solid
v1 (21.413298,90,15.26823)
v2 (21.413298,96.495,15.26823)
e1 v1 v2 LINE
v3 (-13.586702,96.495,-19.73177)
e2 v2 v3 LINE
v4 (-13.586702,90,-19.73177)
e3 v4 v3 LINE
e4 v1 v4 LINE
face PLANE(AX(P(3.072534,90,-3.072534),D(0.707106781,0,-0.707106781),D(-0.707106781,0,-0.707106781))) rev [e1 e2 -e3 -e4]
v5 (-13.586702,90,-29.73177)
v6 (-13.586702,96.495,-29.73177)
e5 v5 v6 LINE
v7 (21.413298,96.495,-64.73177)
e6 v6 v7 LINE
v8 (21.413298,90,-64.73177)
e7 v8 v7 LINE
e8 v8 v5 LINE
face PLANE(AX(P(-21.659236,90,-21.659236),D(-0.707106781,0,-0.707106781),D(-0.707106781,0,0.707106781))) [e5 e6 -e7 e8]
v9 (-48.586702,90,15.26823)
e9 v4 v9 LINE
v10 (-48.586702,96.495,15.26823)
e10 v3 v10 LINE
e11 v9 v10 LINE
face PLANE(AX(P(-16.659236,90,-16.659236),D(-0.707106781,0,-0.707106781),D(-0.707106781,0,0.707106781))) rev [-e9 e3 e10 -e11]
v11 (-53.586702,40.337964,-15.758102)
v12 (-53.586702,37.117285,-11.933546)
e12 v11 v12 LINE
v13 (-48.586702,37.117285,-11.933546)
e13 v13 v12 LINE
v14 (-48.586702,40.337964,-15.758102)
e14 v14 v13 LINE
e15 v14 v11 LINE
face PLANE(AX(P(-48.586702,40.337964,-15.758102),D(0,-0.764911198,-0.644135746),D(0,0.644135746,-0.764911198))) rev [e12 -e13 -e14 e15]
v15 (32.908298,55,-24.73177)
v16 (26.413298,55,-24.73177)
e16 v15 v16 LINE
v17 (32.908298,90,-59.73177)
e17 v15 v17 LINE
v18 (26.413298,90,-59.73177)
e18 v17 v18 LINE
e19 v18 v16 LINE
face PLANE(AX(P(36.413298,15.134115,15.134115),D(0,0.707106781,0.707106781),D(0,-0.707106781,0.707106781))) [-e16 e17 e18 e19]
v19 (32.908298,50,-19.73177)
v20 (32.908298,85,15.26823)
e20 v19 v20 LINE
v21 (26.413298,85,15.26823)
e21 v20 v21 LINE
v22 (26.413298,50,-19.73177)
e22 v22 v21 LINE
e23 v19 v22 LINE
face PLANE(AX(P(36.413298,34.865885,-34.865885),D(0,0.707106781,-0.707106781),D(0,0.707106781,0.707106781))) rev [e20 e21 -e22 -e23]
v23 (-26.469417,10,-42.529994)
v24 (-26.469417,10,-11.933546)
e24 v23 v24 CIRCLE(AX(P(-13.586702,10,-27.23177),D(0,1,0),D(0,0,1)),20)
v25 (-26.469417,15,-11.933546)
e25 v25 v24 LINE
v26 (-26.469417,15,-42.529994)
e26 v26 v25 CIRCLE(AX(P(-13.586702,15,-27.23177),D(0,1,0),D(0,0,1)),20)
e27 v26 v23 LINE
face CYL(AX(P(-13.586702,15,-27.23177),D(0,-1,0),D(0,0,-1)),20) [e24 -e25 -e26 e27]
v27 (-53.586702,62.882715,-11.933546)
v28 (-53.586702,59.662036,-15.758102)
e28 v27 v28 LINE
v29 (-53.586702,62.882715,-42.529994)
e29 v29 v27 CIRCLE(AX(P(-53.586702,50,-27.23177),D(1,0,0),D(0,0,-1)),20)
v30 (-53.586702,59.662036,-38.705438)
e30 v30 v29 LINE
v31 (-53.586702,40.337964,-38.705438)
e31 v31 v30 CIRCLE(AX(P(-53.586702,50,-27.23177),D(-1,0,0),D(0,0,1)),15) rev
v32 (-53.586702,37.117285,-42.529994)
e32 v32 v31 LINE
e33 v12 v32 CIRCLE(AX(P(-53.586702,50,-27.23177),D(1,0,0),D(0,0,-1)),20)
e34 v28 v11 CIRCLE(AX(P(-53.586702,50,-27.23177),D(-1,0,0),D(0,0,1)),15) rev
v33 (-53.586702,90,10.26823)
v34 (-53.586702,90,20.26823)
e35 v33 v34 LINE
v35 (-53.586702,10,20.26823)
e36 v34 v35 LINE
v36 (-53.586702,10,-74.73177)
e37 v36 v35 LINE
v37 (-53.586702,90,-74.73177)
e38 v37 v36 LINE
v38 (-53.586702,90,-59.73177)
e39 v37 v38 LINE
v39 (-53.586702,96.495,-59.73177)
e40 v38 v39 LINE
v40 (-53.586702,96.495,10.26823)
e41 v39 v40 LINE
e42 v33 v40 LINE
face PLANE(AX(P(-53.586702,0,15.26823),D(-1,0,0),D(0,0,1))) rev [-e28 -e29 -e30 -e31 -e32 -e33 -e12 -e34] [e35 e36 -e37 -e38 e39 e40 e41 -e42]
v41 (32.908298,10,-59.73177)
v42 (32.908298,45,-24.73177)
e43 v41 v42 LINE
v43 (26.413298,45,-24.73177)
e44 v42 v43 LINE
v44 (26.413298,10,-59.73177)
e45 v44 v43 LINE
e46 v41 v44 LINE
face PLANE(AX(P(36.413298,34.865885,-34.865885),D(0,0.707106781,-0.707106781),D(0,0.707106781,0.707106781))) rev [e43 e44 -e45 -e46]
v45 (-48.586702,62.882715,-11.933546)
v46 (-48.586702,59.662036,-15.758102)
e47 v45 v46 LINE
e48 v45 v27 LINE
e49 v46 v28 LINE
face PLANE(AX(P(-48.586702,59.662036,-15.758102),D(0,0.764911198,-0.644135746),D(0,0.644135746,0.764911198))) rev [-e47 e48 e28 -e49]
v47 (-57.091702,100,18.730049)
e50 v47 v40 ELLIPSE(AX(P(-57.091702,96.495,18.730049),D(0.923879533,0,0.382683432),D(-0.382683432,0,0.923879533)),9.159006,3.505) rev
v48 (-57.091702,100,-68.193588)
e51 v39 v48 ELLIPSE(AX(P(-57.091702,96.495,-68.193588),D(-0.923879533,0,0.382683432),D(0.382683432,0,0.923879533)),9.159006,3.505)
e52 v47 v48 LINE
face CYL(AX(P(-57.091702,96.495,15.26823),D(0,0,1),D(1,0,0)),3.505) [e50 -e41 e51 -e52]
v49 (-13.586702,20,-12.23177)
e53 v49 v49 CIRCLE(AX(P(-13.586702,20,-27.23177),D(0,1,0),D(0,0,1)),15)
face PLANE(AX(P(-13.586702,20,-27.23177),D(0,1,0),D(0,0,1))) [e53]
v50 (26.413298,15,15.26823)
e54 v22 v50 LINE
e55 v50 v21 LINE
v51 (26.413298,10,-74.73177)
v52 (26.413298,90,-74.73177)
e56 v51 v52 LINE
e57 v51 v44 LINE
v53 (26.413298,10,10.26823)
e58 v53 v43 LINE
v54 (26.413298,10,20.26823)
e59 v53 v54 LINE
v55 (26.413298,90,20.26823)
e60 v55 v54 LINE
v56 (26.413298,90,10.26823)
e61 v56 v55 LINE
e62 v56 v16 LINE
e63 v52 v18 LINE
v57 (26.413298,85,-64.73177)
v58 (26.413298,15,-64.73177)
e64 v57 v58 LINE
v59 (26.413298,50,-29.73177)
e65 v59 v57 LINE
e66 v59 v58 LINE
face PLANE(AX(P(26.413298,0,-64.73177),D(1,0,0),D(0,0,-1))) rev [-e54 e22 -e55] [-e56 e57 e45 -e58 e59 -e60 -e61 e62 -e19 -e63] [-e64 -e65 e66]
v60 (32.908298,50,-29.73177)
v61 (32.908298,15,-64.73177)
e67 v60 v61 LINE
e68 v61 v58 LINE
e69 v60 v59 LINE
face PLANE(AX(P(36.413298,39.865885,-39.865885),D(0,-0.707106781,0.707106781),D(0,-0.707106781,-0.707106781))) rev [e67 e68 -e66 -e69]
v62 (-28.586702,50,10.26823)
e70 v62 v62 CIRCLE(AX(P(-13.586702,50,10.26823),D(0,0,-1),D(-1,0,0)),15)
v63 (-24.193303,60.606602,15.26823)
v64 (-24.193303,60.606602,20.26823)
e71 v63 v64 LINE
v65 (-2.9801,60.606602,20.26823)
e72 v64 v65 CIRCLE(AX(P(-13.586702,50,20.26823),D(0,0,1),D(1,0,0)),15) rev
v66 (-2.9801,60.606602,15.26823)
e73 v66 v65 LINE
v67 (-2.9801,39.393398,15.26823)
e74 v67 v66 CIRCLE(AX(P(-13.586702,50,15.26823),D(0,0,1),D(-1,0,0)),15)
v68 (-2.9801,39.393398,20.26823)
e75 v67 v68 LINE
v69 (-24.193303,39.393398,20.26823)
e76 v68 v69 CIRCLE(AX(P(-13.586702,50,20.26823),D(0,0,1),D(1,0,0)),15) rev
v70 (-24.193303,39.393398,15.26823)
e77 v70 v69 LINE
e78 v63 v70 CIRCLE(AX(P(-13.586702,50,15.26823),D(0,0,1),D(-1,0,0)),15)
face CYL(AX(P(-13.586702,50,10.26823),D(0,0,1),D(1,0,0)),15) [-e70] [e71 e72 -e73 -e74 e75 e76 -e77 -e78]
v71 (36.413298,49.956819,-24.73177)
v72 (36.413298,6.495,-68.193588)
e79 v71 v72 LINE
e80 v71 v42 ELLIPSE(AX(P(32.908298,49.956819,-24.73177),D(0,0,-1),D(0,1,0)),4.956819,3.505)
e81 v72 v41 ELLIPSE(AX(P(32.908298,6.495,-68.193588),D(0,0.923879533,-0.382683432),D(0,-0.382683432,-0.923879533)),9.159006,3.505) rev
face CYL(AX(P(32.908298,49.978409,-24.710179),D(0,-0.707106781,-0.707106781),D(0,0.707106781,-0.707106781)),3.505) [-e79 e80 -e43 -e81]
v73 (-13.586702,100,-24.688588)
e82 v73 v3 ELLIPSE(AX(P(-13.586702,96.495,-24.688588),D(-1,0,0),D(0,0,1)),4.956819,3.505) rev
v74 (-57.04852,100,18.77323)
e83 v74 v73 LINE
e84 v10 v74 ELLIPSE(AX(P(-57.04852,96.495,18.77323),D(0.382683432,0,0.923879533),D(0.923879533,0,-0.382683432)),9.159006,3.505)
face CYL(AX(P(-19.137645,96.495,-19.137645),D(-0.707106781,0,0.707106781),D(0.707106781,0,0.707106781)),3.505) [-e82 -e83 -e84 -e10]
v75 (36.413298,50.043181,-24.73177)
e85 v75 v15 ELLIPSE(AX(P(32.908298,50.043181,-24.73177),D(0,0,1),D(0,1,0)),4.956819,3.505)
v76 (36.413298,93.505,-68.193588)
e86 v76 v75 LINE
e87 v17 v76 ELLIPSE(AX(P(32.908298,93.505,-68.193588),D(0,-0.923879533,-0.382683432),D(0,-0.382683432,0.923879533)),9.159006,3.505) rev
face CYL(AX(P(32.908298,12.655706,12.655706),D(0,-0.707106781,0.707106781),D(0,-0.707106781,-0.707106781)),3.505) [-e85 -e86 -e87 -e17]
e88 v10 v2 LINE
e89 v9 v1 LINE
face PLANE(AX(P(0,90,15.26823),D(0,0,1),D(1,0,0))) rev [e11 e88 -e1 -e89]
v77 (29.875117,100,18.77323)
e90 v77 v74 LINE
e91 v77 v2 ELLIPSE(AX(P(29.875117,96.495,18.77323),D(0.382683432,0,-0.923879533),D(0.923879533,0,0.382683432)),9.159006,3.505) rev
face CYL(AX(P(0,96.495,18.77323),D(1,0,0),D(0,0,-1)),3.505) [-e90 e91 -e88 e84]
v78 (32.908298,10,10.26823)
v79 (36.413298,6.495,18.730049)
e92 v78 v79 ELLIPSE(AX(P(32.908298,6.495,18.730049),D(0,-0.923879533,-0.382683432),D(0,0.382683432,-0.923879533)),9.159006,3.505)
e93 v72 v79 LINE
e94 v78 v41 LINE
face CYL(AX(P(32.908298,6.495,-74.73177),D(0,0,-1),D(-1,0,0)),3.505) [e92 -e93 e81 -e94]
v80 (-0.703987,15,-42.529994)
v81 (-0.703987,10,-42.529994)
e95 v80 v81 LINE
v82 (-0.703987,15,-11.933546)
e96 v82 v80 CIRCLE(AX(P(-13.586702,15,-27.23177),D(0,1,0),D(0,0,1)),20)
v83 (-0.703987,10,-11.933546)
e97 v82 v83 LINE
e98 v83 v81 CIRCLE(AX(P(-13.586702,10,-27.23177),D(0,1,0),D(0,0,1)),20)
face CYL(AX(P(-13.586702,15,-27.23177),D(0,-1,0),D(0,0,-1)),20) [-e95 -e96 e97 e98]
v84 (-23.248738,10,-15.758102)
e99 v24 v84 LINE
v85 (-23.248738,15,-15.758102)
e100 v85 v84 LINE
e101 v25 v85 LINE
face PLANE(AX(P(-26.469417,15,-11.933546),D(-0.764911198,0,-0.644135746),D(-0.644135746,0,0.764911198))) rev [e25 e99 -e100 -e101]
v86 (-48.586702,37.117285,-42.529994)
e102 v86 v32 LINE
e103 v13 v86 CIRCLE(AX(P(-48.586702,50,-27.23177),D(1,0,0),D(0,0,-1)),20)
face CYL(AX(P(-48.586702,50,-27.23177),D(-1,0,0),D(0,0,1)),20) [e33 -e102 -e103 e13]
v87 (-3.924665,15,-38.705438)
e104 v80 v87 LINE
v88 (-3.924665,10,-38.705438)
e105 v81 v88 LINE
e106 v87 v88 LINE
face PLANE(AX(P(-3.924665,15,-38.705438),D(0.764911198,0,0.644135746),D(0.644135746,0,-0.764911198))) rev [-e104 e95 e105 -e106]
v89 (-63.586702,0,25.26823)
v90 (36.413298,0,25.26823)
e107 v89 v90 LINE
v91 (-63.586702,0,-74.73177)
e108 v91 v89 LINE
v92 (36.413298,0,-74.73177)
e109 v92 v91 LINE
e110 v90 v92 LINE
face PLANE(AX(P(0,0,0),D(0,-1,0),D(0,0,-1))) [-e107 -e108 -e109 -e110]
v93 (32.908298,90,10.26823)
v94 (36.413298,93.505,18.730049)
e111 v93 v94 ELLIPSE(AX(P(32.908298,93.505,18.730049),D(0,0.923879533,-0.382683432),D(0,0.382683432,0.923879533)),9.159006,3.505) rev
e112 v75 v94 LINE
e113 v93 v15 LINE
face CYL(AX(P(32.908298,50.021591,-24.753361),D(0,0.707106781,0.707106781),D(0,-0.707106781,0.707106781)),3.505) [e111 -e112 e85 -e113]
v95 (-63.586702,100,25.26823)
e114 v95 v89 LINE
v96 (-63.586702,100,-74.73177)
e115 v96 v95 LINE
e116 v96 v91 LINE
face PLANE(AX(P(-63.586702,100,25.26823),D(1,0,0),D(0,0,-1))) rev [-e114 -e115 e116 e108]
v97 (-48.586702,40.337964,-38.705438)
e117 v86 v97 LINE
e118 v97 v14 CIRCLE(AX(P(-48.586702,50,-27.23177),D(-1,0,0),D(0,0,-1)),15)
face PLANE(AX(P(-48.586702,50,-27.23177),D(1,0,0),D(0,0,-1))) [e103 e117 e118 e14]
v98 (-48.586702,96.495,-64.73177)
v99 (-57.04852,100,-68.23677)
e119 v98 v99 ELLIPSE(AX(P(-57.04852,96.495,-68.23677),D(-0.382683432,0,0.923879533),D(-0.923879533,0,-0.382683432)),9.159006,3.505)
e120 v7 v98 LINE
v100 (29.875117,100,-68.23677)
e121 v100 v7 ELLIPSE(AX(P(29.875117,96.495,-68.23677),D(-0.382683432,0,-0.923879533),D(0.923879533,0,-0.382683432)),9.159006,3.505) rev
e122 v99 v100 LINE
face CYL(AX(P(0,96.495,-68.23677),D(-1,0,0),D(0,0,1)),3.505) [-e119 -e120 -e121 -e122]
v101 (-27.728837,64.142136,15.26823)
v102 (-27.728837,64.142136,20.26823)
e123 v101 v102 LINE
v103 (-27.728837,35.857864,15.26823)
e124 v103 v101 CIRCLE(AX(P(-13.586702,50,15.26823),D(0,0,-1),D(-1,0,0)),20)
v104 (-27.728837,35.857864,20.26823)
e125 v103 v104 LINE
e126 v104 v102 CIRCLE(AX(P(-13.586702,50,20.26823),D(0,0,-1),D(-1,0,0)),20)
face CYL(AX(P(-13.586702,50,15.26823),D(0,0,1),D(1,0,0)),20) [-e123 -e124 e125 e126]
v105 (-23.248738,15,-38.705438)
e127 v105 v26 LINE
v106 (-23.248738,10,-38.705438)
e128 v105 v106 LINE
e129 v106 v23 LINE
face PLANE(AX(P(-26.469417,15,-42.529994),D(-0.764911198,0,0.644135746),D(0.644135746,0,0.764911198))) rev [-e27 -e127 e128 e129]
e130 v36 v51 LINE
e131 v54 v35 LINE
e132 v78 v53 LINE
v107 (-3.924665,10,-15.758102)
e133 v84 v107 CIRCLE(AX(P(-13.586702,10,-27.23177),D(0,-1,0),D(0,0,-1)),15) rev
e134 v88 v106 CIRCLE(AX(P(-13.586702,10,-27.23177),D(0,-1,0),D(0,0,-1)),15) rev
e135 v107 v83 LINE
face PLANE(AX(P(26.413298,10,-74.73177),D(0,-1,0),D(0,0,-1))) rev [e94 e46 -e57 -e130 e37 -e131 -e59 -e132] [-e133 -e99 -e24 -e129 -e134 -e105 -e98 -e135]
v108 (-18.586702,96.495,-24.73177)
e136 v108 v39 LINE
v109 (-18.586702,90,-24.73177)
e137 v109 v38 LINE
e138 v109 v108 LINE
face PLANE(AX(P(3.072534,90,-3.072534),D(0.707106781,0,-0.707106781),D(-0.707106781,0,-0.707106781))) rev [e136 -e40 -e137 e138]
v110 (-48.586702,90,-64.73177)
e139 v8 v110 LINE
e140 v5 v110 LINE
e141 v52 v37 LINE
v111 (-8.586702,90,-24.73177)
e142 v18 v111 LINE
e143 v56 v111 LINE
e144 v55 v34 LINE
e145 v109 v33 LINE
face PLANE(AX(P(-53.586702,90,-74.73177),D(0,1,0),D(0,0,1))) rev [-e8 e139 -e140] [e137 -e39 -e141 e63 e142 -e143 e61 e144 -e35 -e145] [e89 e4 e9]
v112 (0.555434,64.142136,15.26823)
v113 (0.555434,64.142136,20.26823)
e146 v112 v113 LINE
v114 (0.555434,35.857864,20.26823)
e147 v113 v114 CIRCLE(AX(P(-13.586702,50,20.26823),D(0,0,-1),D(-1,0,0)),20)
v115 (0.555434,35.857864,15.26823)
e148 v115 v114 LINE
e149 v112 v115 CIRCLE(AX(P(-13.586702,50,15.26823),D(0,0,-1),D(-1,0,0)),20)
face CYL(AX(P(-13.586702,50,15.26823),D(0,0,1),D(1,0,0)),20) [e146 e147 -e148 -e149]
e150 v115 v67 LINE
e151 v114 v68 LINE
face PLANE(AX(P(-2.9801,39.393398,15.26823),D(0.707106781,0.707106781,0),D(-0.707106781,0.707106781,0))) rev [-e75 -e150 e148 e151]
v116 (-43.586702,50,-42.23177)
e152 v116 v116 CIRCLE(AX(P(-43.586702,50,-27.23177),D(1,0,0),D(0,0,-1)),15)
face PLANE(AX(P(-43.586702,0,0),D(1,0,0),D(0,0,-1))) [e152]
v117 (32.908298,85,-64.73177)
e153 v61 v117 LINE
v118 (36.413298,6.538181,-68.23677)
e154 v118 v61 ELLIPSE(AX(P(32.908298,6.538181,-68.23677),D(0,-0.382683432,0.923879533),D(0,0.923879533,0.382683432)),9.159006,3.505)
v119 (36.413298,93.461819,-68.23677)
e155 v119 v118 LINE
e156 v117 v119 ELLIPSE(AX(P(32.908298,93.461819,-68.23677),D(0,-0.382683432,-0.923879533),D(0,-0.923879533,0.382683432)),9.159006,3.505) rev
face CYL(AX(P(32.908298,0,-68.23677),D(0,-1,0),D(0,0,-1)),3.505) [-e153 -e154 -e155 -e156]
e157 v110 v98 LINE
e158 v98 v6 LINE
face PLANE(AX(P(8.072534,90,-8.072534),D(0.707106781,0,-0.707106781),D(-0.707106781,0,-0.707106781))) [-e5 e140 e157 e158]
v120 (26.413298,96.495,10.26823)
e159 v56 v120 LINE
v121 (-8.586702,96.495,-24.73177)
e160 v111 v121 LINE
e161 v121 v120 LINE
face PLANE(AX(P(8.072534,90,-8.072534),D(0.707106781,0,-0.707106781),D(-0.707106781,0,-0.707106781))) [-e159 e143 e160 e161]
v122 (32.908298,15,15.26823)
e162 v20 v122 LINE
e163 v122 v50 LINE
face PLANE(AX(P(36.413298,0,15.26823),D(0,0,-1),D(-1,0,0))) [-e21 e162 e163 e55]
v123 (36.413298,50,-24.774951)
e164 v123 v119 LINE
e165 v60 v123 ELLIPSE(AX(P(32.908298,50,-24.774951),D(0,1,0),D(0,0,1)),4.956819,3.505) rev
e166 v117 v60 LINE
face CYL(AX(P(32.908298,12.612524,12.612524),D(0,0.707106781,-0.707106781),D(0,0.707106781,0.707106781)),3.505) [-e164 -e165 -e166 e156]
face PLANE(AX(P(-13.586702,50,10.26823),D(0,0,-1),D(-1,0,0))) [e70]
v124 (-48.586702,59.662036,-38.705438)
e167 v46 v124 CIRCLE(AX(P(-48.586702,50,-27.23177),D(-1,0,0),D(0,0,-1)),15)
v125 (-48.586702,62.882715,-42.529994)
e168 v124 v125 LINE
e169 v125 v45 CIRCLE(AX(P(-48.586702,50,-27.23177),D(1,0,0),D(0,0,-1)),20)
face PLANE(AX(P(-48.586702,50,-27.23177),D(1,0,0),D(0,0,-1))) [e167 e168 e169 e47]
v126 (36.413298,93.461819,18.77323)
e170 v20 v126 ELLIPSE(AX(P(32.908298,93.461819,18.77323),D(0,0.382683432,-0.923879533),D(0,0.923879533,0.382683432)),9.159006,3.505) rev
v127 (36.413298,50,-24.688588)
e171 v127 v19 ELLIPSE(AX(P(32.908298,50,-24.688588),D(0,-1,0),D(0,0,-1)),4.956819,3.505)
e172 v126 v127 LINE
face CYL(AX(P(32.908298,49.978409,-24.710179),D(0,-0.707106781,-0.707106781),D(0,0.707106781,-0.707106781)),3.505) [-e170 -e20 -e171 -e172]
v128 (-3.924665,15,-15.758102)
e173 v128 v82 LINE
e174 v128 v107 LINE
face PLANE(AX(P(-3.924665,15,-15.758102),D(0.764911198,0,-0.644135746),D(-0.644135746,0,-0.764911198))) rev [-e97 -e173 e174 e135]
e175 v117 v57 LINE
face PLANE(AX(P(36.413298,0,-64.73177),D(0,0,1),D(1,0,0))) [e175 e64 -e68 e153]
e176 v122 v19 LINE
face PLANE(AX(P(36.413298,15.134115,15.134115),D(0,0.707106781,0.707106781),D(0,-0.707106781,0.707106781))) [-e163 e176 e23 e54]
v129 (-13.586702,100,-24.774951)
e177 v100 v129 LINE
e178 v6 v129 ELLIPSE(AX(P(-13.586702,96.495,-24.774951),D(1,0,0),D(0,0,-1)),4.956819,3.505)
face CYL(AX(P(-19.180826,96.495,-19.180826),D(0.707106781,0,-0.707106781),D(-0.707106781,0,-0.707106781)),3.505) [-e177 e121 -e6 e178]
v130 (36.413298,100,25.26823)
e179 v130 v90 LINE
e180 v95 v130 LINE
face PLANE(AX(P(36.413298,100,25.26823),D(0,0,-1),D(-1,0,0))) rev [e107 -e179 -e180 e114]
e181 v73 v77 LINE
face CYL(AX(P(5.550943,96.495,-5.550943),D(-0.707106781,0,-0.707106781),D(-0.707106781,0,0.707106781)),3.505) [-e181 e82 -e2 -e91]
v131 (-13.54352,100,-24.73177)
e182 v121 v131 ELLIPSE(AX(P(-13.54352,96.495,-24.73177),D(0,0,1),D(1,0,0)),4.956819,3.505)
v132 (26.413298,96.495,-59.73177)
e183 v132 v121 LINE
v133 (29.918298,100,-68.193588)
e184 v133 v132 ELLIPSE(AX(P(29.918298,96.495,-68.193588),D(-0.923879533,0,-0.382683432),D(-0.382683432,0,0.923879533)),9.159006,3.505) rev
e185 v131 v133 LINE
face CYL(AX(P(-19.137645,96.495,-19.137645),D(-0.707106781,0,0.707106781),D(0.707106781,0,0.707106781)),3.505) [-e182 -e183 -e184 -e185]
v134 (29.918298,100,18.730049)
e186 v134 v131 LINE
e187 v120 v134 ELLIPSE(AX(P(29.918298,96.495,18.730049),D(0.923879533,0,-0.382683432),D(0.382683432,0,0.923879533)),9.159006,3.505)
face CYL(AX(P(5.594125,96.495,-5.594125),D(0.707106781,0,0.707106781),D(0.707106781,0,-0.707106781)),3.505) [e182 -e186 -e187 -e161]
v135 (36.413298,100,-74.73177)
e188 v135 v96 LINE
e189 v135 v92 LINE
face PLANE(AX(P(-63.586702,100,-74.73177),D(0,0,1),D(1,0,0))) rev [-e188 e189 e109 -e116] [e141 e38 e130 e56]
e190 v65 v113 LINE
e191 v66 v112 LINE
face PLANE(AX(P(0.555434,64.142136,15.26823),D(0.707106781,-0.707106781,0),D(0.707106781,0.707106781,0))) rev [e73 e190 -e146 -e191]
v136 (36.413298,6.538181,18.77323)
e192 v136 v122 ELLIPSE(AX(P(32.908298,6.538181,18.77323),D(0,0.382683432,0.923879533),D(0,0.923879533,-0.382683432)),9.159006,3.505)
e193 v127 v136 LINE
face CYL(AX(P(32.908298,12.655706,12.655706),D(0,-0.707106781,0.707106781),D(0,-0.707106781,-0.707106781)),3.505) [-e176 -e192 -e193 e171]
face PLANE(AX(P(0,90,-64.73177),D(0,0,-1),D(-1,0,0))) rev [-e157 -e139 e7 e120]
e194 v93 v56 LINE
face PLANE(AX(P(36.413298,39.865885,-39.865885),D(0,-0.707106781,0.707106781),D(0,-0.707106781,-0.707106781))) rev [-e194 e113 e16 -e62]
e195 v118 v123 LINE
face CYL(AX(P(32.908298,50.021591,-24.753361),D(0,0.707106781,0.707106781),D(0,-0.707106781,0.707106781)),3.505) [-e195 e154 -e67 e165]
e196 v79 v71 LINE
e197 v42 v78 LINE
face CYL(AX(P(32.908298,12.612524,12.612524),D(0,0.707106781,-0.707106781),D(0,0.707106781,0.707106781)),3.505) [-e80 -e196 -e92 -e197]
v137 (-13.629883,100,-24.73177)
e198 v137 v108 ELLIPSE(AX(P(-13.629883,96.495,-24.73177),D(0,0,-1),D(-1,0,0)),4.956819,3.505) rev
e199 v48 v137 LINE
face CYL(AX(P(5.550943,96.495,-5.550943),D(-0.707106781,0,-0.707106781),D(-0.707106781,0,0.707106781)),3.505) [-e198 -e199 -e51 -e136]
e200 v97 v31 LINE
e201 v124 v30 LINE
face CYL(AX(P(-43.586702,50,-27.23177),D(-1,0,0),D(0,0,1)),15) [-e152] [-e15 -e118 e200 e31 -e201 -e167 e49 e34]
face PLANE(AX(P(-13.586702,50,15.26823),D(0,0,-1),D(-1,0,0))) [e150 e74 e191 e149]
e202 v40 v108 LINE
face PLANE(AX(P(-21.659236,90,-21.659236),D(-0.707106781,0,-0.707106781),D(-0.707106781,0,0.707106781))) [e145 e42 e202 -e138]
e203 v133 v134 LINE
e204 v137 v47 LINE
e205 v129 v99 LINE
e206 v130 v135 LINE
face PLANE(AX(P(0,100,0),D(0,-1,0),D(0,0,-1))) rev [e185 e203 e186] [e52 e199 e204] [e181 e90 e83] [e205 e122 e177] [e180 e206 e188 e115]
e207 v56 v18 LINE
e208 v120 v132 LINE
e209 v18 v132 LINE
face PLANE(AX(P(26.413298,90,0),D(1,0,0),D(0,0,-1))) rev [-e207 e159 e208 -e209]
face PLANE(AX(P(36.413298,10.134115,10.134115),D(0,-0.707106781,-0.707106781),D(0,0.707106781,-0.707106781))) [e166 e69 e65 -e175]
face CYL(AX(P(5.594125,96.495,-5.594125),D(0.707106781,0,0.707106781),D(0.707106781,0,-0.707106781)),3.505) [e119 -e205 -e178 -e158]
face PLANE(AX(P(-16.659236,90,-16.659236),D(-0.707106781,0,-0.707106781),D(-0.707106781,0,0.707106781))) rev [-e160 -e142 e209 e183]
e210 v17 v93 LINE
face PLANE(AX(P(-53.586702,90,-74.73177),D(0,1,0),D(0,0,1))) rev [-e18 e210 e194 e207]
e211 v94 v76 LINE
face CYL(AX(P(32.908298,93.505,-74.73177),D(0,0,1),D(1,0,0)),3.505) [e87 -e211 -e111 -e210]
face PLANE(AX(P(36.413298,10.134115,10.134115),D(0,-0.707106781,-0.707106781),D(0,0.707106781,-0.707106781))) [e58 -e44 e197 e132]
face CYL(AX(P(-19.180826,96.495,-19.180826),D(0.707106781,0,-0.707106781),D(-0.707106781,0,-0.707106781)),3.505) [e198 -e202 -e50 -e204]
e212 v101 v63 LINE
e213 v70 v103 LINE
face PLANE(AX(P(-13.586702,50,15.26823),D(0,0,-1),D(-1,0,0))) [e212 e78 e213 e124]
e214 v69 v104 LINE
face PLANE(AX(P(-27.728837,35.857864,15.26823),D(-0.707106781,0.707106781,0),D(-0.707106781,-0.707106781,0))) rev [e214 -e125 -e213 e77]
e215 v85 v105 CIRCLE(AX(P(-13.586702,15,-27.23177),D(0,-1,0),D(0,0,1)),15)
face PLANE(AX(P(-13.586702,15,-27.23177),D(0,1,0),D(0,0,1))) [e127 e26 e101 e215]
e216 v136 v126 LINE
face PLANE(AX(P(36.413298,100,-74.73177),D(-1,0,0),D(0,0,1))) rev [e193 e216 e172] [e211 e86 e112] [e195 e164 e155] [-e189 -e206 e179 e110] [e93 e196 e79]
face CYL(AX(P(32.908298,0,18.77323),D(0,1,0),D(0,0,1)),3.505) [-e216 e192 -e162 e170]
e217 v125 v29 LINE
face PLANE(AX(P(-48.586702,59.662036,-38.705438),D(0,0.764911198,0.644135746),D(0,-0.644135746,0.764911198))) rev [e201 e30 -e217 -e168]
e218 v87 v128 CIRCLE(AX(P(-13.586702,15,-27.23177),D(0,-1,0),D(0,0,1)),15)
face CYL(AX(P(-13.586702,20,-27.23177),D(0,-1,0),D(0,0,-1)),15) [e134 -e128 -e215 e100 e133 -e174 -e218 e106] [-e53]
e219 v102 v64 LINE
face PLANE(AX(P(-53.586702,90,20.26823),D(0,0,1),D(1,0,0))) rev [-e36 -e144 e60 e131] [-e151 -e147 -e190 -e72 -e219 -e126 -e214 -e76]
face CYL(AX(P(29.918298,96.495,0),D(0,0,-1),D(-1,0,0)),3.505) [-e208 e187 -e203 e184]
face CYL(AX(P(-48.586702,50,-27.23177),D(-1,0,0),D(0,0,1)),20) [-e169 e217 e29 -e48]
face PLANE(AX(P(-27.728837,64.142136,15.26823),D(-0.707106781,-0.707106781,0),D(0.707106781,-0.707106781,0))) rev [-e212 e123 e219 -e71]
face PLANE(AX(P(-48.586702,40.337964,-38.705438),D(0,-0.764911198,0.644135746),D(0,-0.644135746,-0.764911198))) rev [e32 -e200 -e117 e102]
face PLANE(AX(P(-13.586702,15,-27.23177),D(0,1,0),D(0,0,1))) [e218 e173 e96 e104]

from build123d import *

# Parameters (mm, degrees)
SKETCH1_W            = 100
SKETCH1_H            = 100
BOSS_EXTRUDE1_DEPTH  = 100
SKETCH2_W            = 80
SKETCH2_H            = 80
CUT_EXTRUDE1_DEPTH   = 100
SKETCH3_W            = 80
SKETCH3_H            = 80
CUT_EXTRUDE2_DEPTH   = 100
CUT_EXTRUDE3_DEPTH   = 100
FILLET39_R           = 3.505
FILLET40_R           = 3.505
FILLET41_R           = 3.505
FILLET42_R           = 3.505
SKETCH5_W            = 80
SKETCH5_H            = 5
BOSS_EXTRUDE2_DEPTH  = 80
BOSS_EXTRUDE4_DEPTH  = 10
FILLET106_R          = 3.505
FILLET107_R          = 3.505
FILLET108_R          = 3.505
FILLET109_R          = 3.505
SKETCH10_W           = 100
SKETCH10_H           = 100
BOSS_EXTRUDE6_DEPTH  = 10
SKETCH11_W           = 100
SKETCH11_H           = 100
BOSS_EXTRUDE7_DEPTH  = 10
SKETCH12_R           = 15
BOSS_EXTRUDE8_DEPTH  = 10
BOSS_EXTRUDE9_DEPTH  = 5
SKETCH18_R           = 15
BOSS_EXTRUDE10_DEPTH = 10
BOSS_EXTRUDE11_DEPTH = 5
CUT_EXTRUDE4_DEPTH   = 10
SKETCH26_W           = 91.840928508
SKETCH26_H           = 89.348142656
BOSS_EXTRUDE12_DEPTH = 10
FILLET113_R          = 3.505
FILLET114_R          = 3.505
SKETCH28_R           = 15
BOSS_EXTRUDE13_DEPTH = 10
BOSS_EXTRUDE14_DEPTH = 5
FILLET115_R          = 3.505


# Some blends are built 0.0001 mm under size
with BuildPart() as part:
    # Sketch1 → Boss-Extrude1 (new body)
    with BuildSketch(Plane(origin=(0, 0, 0), x_dir=(1, 0, 0), z_dir=(0, 1, 0))):
        with Locations((-13.586701651, 24.731769861)):
            Rectangle(SKETCH1_W, SKETCH1_H)
    extrude(amount=BOSS_EXTRUDE1_DEPTH)

    # Sketch2 → Cut-Extrude1 (cut)
    with BuildSketch(Plane(origin=(0, 100, 0), x_dir=(1, 0, 0), z_dir=(0, 1, 0))):
        with Locations((-13.586701651, 24.731769861)):
            Rectangle(SKETCH2_W, SKETCH2_H)
    extrude(amount=-CUT_EXTRUDE1_DEPTH, mode=Mode.SUBTRACT)

    # Sketch3 → Cut-Extrude2 (cut)
    with BuildSketch(Plane.XY.offset(25.268230139)):
        with Locations((-13.586701651, 50)):
            Rectangle(SKETCH3_W, SKETCH3_H)
    extrude(amount=-CUT_EXTRUDE2_DEPTH, mode=Mode.SUBTRACT)

    # Sketch4 → Cut-Extrude3 (cut)
    with BuildSketch(Plane.ZY.offset(63.586701651)):
        Polygon((-59.731769861, 10), (10.268230139, 10), (-24.731769861, 45), align=None)
        Polygon((-64.731769861, 15), (-29.731769861, 50), (-64.731769861, 85), align=None)
        Polygon((-59.731769861, 90), (-24.731769861, 55), (10.268230139, 90), align=None)
        Polygon((-19.731769861, 50), (15.268230139, 15), (15.268230139, 85), align=None)
    extrude(amount=-CUT_EXTRUDE3_DEPTH, mode=Mode.SUBTRACT)

    # Fillet39
    # the kernel refuses this fillet: 3.505 mm, written as the material it adds along each edge
    with BuildSketch(Plane(origin=(-63.586701651, 45, -24.731769861), x_dir=(0, -0.7071067811865476, -0.7071067811865476), z_dir=(1, 0, 0))) as fillet39_piece_1:
        with BuildLine():
            CenterArc((FILLET39_R, -FILLET39_R), FILLET39_R, 90, 90)
            Line((0, -FILLET39_R), (0, 0))
            Line((0, 0), (FILLET39_R, 0))
        make_face()
    extrude(amount=10)
    with BuildSketch(Plane(origin=(-63.586701651, 10, 10.268230139), x_dir=(0, 0, -1), z_dir=(1, 0, 0))) as fillet39_piece_2:
        with BuildLine():
            CenterArc((FILLET39_R * 2.41421356237, FILLET39_R), FILLET39_R, 135, 135)
            Line((FILLET39_R * 1.70710678119, FILLET39_R * 1.70710678119), (0, 0))
            Line((0, 0), (FILLET39_R * 2.41421356237, 0))
        make_face()
    extrude(amount=10)
    # the kernel refuses this fillet: 3.505 mm, written as the material it takes off along each edge
    with BuildSketch(Plane(origin=(-63.586701651, 15.983409268, 4.284820871), x_dir=(0, 0.7071067811865476, 0.7071067811865476), z_dir=(0, 0.7071067811865475, -0.7071067811865476)), Plane(origin=(-53.586701651, 42.521590732, -22.253360593), x_dir=(0, 0.7071067811865476, 0.7071067811865476), z_dir=(0, -0.7071067811865475, 0.7071067811865476))) as fillet39_2_piece_1:
        with BuildLine():
            CenterArc((FILLET39_R, FILLET39_R), FILLET39_R, 180, 90)
            Line((0, FILLET39_R), (0, 0))
            Line((0, 0), (FILLET39_R, 0))
        make_face()
    extrude(amount=37.530656147, mode=Mode.SUBTRACT)
    with BuildSketch(Plane(origin=(-63.586701651, 10, -68.494269861), x_dir=(0, -1, 0), z_dir=(0, 0, 1))) as fillet39_2_piece_2_section:
        with BuildLine():
            CenterArc((FILLET39_R, FILLET39_R), FILLET39_R, 180, 90)
            Line((0, FILLET39_R), (0, 0))
            Line((0, 0), (FILLET39_R, 0))
        make_face()
    fillet39_2_piece_2 = extrude(amount=70.300681464, mode=Mode.PRIVATE)
    fillet39_2_piece_2 = split(fillet39_2_piece_2, bisect_by=Plane(origin=(-62.798598249, 24.782539109, -44.949230752), z_dir=(0, -0.7071067811865476, 0.7071067811865476)), keep=Keep.TOP, mode=Mode.PRIVATE)
    add(fillet39_2_piece_2, mode=Mode.SUBTRACT)
    with BuildSketch(Plane(origin=(-53.586701651, 3.80397683, -65.927793031), x_dir=(0, 0.7071067811865475, -0.7071067811865475), z_dir=(0, 0.7071067811865476, 0.7071067811865476))) as fillet39_2_piece_3_section:
        with BuildLine():
            CenterArc((FILLET39_R, FILLET39_R), FILLET39_R, 180, 90)
            Line((0, FILLET39_R), (0, 0))
            Line((0, 0), (FILLET39_R, 0))
        make_face()
    fillet39_2_piece_3 = extrude(amount=54.754974683, mode=Mode.PRIVATE)
    fillet39_2_piece_3 = split(fillet39_2_piece_3, bisect_by=Plane(origin=(-54.373006967, 10, -44.325568199), z_dir=(0, 1, 0)), keep=Keep.TOP, mode=Mode.PRIVATE)
    add(fillet39_2_piece_3, mode=Mode.SUBTRACT)
    with BuildSketch(Plane(origin=(-53.586701651, 10, 1.806411603), x_dir=(0, -1, 0), z_dir=(0, 0, -1))) as fillet39_2_piece_4_section:
        with BuildLine():
            CenterArc((FILLET39_R, FILLET39_R), FILLET39_R, 180, 90)
            Line((0, FILLET39_R), (0, 0))
            Line((0, 0), (FILLET39_R, 0))
        make_face()
    fillet39_2_piece_4 = extrude(amount=70.300681464, mode=Mode.PRIVATE)
    fillet39_2_piece_4 = split(fillet39_2_piece_4, bisect_by=Plane(origin=(-54.374805052, 24.782539109, -44.949230752), z_dir=(0, -0.7071067811865476, 0.7071067811865476)), keep=Keep.TOP, mode=Mode.PRIVATE)
    add(fillet39_2_piece_4, mode=Mode.SUBTRACT)
    with BuildSketch(Plane(origin=(-63.586701651, 42.521590732, -27.210179129), x_dir=(0, 0.7071067811865476, -0.7071067811865476), z_dir=(0, -0.7071067811865476, -0.7071067811865476))) as fillet39_2_piece_5_section:
        with BuildLine():
            CenterArc((FILLET39_R, FILLET39_R), FILLET39_R, 180, 90)
            Line((0, FILLET39_R), (0, 0))
            Line((0, 0), (FILLET39_R, 0))
        make_face()
    fillet39_2_piece_5 = extrude(amount=54.754974683, mode=Mode.PRIVATE)
    fillet39_2_piece_5 = split(fillet39_2_piece_5, bisect_by=Plane(origin=(-62.800396334, 10, -44.325568199), z_dir=(0, 1, 0)), keep=Keep.TOP, mode=Mode.PRIVATE)
    add(fillet39_2_piece_5, mode=Mode.SUBTRACT)
    with BuildSketch(Plane(origin=(-63.586701651, 40.043181464, -24.731769861), x_dir=(0, 0.7071067811865476, -0.7071067811865476), z_dir=(0, -0.7071067811865476, -0.7071067811865476))) as fillet39_2_piece_6:
        with BuildLine():
            CenterArc((3.505 + FILLET39_R, FILLET39_R), FILLET39_R, 180, 90)
            Line((3.505, FILLET39_R), (3.505, 0))
            Line((3.505, 0), (3.505 + FILLET39_R, 0))
        make_face()
    revolve(axis=Axis((-63.586701651, 40.043181464, -24.731769861), (1, 0, 0)), revolution_arc=90, mode=Mode.SUBTRACT)
    with BuildSketch(Plane(origin=(-53.586701651, 13.505, 1.806411603), x_dir=(0, -1, 0), z_dir=(0, 0, -1))) as fillet39_2_piece_7:
        with BuildLine():
            CenterArc((3.505 + FILLET39_R, FILLET39_R), FILLET39_R, 180, 90)
            Line((3.505, FILLET39_R), (3.505, 0))
            Line((3.505, 0), (3.505 + FILLET39_R, 0))
        make_face()
    revolve(axis=Axis((-53.586701651, 13.505, 1.806411603), (-1, 0, 0)), revolution_arc=135, mode=Mode.SUBTRACT)
    with BuildSketch(Plane(origin=(-53.586701651, 40.043181464, -24.731769861), x_dir=(0, 0.7071067811865476, -0.7071067811865476), z_dir=(0, -0.7071067811865476, -0.7071067811865476))) as fillet39_2_piece_8:
        with BuildLine():
            CenterArc((3.505 + FILLET39_R, -FILLET39_R), FILLET39_R, 90, 90)
            Line((3.505, -FILLET39_R), (3.505, 0))
            Line((3.505, 0), (3.505 + FILLET39_R, 0))
        make_face()
    revolve(axis=Axis((-53.586701651, 40.043181464, -24.731769861), (1, 0, 0)), revolution_arc=90, mode=Mode.SUBTRACT)
    with BuildSketch(Plane(origin=(-63.586701651, 13.505, 1.806411603), x_dir=(0, -1, 0), z_dir=(0, 0, -1))) as fillet39_2_piece_9:
        with BuildLine():
            CenterArc((3.505 + FILLET39_R, -FILLET39_R), FILLET39_R, 90, 90)
            Line((3.505, -FILLET39_R), (3.505, 0))
            Line((3.505, 0), (3.505 + FILLET39_R, 0))
        make_face()
    revolve(axis=Axis((-63.586701651, 13.505, 1.806411603), (-1, 0, 0)), revolution_arc=135, mode=Mode.SUBTRACT)
    with BuildSketch(Plane(origin=(-63.586701651, 42.521590732, -27.210179129), x_dir=(0, 0.7071067811865476, -0.7071067811865476), z_dir=(0, -0.7071067811865476, -0.7071067811865476))) as fillet39_2_piece_10a_section:
        with BuildLine():
            CenterArc((FILLET39_R, FILLET39_R), FILLET39_R, 180, 90)
            Line((0, FILLET39_R), (0, 0))
            Line((0, 0), (FILLET39_R, 0))
        make_face()
    fillet39_2_piece_10a = extrude(amount=54.754974683, mode=Mode.PRIVATE)
    fillet39_2_piece_10a = split(fillet39_2_piece_10a, bisect_by=Plane(origin=(-62.750859381, 10, -63.595436252), z_dir=(0, -1, 0)), keep=Keep.TOP, mode=Mode.PRIVATE)
    with BuildSketch(Plane(origin=(-63.586701651, 10, -68.494269861), x_dir=(0, -1, 0), z_dir=(0, 0, 1))) as fillet39_2_piece_10b_section:
        with BuildLine():
            CenterArc((FILLET39_R, FILLET39_R), FILLET39_R, 180, 90)
            Line((0, FILLET39_R), (0, 0))
            Line((0, 0), (FILLET39_R, 0))
        make_face()
    fillet39_2_piece_10b = extrude(amount=70.300681464, mode=Mode.PRIVATE)
    fillet39_2_piece_10b = split(fillet39_2_piece_10b, bisect_by=Plane(origin=(-62.750859381, 7.267975294, -62.463794567), z_dir=(0, 0.7071067811865476, -0.7071067811865476)), keep=Keep.TOP, mode=Mode.PRIVATE)
    fillet39_2_piece_10 = fillet39_2_piece_10a & fillet39_2_piece_10b
    add(fillet39_2_piece_10, mode=Mode.SUBTRACT)
    with BuildSketch(Plane(origin=(-53.586701651, 3.80397683, -65.927793031), x_dir=(0, 0.7071067811865475, -0.7071067811865475), z_dir=(0, 0.7071067811865476, 0.7071067811865476))) as fillet39_2_piece_11a_section:
        with BuildLine():
            CenterArc((FILLET39_R, FILLET39_R), FILLET39_R, 180, 90)
            Line((0, FILLET39_R), (0, 0))
            Line((0, 0), (FILLET39_R, 0))
        make_face()
    fillet39_2_piece_11a = extrude(amount=54.754974683, mode=Mode.PRIVATE)
    fillet39_2_piece_11a = split(fillet39_2_piece_11a, bisect_by=Plane(origin=(-54.503230396, 7.913859932, -64.731769861), z_dir=(0, 0, 1)), keep=Keep.TOP, mode=Mode.PRIVATE)
    fillet39_2_piece_11a = split(fillet39_2_piece_11a, bisect_by=Plane(origin=(-54.503230396, 10, -62.645629793), z_dir=(0, -1, 0)), keep=Keep.TOP, mode=Mode.PRIVATE)
    with BuildSketch(Plane(origin=(-53.586701651, 10, 1.806411603), x_dir=(0, -1, 0), z_dir=(0, 0, -1))) as fillet39_2_piece_11b_section:
        with BuildLine():
            CenterArc((FILLET39_R, FILLET39_R), FILLET39_R, 180, 90)
            Line((0, FILLET39_R), (0, 0))
            Line((0, 0), (FILLET39_R, 0))
        make_face()
    fillet39_2_piece_11b = extrude(amount=70.300681464, mode=Mode.PRIVATE)
    fillet39_2_piece_11b = split(fillet39_2_piece_11b, bisect_by=Plane(origin=(-54.460403752, 9.342219977, -64.731769861), z_dir=(0, 0, 1)), keep=Keep.TOP, mode=Mode.PRIVATE)
    fillet39_2_piece_11b = split(fillet39_2_piece_11b, bisect_by=Plane(origin=(-54.460403752, 8.256664983, -61.475104878), z_dir=(0, 0.7071067811865476, -0.7071067811865476)), keep=Keep.TOP, mode=Mode.PRIVATE)
    fillet39_2_piece_11 = fillet39_2_piece_11a & fillet39_2_piece_11b
    add(fillet39_2_piece_11, mode=Mode.SUBTRACT)

    # Fillet40
    fillet40_edges = [part.edges().sort_by_distance(p)[0] for p in [
        (-63.586701651, 72.5, -42.231769861),
        (-58.586701651, 90, -59.731769861),
        (-63.586701651, 90, -24.731769861),
        (-53.586701651, 72.5, -7.231769861),
        (-58.586701651, 90, 10.268230139),
        (-53.586701651, 72.5, -42.231769861),
        (-53.586701651, 90, -24.731769861),
        (-63.586701651, 72.5, -7.231769861),
    ]]
    fillet(fillet40_edges, radius=FILLET40_R)

    # Fillet41
    fillet41_edges = [part.edges().sort_by_distance(p)[0] for p in [
        (-58.586701651, 85, 15.268230139),
        (-63.586701651, 50, 15.268230139),
        (-58.586701651, 15, 15.268230139),
        (-63.586701651, 32.5, -2.231769861),
        (-53.586701651, 67.5, -2.231769861),
        (-53.586701651, 50, 15.268230139),
        (-53.586701651, 32.5, -2.231769861),
        (-63.586701651, 67.5, -2.231769861),
    ]]
    fillet(fillet41_edges, radius=FILLET41_R - 0.0001)  # a hair under: the kernel refuses the full size

    # Fillet42
    # the kernel refuses this fillet: 3.505 mm, written as the material it adds along each edge
    with BuildSketch(Plane(origin=(-63.586701651, 85, -64.731769861), x_dir=(0, -1, 0), z_dir=(1, 0, 0))) as fillet42_piece_1:
        with BuildLine():
            CenterArc((FILLET42_R * 2.41421356237, -FILLET42_R), FILLET42_R, 90, 135)
            Line((FILLET42_R * 1.70710678119, -FILLET42_R * 1.70710678119), (0, 0))
            Line((0, 0), (FILLET42_R * 2.41421356237, 0))
        make_face()
    extrude(amount=10)
    with BuildSketch(Plane(origin=(-63.586701651, 50, -29.731769861), x_dir=(0, 0.7071067811865465, -0.7071067811865486), z_dir=(1, 0, 0))) as fillet42_piece_2:
        with BuildLine():
            CenterArc((FILLET42_R, -FILLET42_R), FILLET42_R, 90, 90)
            Line((0, -FILLET42_R), (0, 0))
            Line((0, 0), (FILLET42_R, 0))
        make_face()
    extrude(amount=10)
    # the kernel refuses this fillet: 3.505 mm, written as the material it takes off along each edge
    with BuildSketch(Plane(origin=(-63.586701651, 76.538181464, -64.731769861), x_dir=(0, 0, -1), z_dir=(0, -1, 0))) as fillet42_2_piece_1_section:
        with BuildLine():
            CenterArc((FILLET42_R, FILLET42_R), FILLET42_R, 180, 90)
            Line((0, FILLET42_R), (0, 0))
            Line((0, 0), (FILLET42_R, 0))
        make_face()
    fillet42_2_piece_1 = extrude(amount=70.300681464, mode=Mode.PRIVATE)
    fillet42_2_piece_1 = split(fillet42_2_piece_1, bisect_by=Plane(origin=(-62.798598249, 29.782539109, -49.949230752), z_dir=(0, 0.7071067811865477, -0.7071067811865475)), keep=Keep.TOP, mode=Mode.PRIVATE)
    add(fillet42_2_piece_1, mode=Mode.SUBTRACT)
    with BuildSketch(Plane(origin=(-63.586701651, 52.478409268, -32.210179129), x_dir=(-5.270787768833835e-14, 0.7071067811865476, 0.7071067811865474), z_dir=(0, 0.7071067811865475, -0.7071067811865476)), Plane(origin=(-53.586701651, 79.016590732, -58.748360593), x_dir=(-5.473510375327444e-14, 0.7071067811865476, 0.7071067811865474), z_dir=(0, -0.7071067811865475, 0.7071067811865476))) as fillet42_2_piece_2:
        with BuildLine():
            CenterArc((FILLET42_R, FILLET42_R), FILLET42_R, 180, 90)
            Line((0, FILLET42_R), (0, 0))
            Line((0, 0), (FILLET42_R, 0))
        make_face()
    extrude(amount=37.530656147, mode=Mode.SUBTRACT)
    with BuildSketch(Plane(origin=(-53.586701651, 47.521590732, -32.210179129), x_dir=(-1, 0, 0), z_dir=(0, -0.7071067811865475, -0.7071067811865477))) as fillet42_2_piece_3_section:
        with BuildLine():
            CenterArc((FILLET42_R, -FILLET42_R), FILLET42_R, 90, 90)
            Line((0, -FILLET42_R), (0, 0))
            Line((0, 0), (FILLET42_R, 0))
        make_face()
    fillet42_2_piece_3 = extrude(amount=54.754974683, mode=Mode.PRIVATE)
    fillet42_2_piece_3 = split(fillet42_2_piece_3, bisect_by=Plane(origin=(-54.373006967, 30.406201662, -64.731769861), z_dir=(0, 0, 1)), keep=Keep.TOP, mode=Mode.PRIVATE)
    add(fillet42_2_piece_3, mode=Mode.SUBTRACT)
    with BuildSketch(Plane(origin=(-53.586701651, 6.2375, -64.731769861), x_dir=(0, 0, -1), z_dir=(0, 1, 0))) as fillet42_2_piece_4_section:
        with BuildLine():
            CenterArc((FILLET42_R, FILLET42_R), FILLET42_R, 180, 90)
            Line((0, FILLET42_R), (0, 0))
            Line((0, 0), (FILLET42_R, 0))
        make_face()
    fillet42_2_piece_4 = extrude(amount=70.300681464, mode=Mode.PRIVATE)
    fillet42_2_piece_4 = split(fillet42_2_piece_4, bisect_by=Plane(origin=(-54.374805052, 29.782539109, -49.949230752), z_dir=(0, 0.7071067811865477, -0.7071067811865475)), keep=Keep.TOP, mode=Mode.PRIVATE)
    add(fillet42_2_piece_4, mode=Mode.SUBTRACT)
    with BuildSketch(Plane(origin=(-63.586701651, 8.80397683, -70.927793031), x_dir=(0, -0.7071067811865476, 0.7071067811865474), z_dir=(0, 0.7071067811865475, 0.7071067811865477))) as fillet42_2_piece_5_section:
        with BuildLine():
            CenterArc((FILLET42_R, FILLET42_R), FILLET42_R, 180, 90)
            Line((0, FILLET42_R), (0, 0))
            Line((0, 0), (FILLET42_R, 0))
        make_face()
    fillet42_2_piece_5 = extrude(amount=54.754974683, mode=Mode.PRIVATE)
    fillet42_2_piece_5 = split(fillet42_2_piece_5, bisect_by=Plane(origin=(-62.800396334, 30.406201662, -64.731769861), z_dir=(0, 0, 1)), keep=Keep.TOP, mode=Mode.PRIVATE)
    add(fillet42_2_piece_5, mode=Mode.SUBTRACT)
    with BuildSketch(Plane(origin=(-63.586701651, 50, -34.688588397), x_dir=(0, 0.7071067811865476, 0.7071067811865476), z_dir=(0, 0.7071067811865476, -0.7071067811865476))) as fillet42_2_piece_6:
        with BuildLine():
            CenterArc((3.505 + FILLET42_R, FILLET42_R), FILLET42_R, 180, 90)
            Line((3.505, FILLET42_R), (3.505, 0))
            Line((3.505, 0), (3.505 + FILLET42_R, 0))
        make_face()
    revolve(axis=Axis((-63.586701651, 50, -34.688588397), (1, 0, 0)), revolution_arc=90, mode=Mode.SUBTRACT)
    with BuildSketch(Plane(origin=(-53.586701651, 76.538181464, -61.226769861), x_dir=(0, 0, -1), z_dir=(0, -1, 0))) as fillet42_2_piece_7:
        with BuildLine():
            CenterArc((3.505 + FILLET42_R, -FILLET42_R), FILLET42_R, 90, 90)
            Line((3.505, -FILLET42_R), (3.505, 0))
            Line((3.505, 0), (3.505 + FILLET42_R, 0))
        make_face()
    revolve(axis=Axis((-53.586701651, 76.538181464, -61.226769861), (1, 0, 0)), revolution_arc=135, mode=Mode.SUBTRACT)
    with BuildSketch(Plane(origin=(-53.586701651, 50, -34.688588397), x_dir=(0, 0.7071067811865476, 0.7071067811865476), z_dir=(0, 0.7071067811865476, -0.7071067811865476))) as fillet42_2_piece_8:
        with BuildLine():
            CenterArc((3.505 + FILLET42_R, -FILLET42_R), FILLET42_R, 90, 90)
            Line((3.505, -FILLET42_R), (3.505, 0))
            Line((3.505, 0), (3.505 + FILLET42_R, 0))
        make_face()
    revolve(axis=Axis((-53.586701651, 50, -34.688588397), (1, 0, 0)), revolution_arc=90, mode=Mode.SUBTRACT)
    with BuildSketch(Plane(origin=(-63.586701651, 76.538181464, -61.226769861), x_dir=(0, 0, -1), z_dir=(0, -1, 0))) as fillet42_2_piece_9:
        with BuildLine():
            CenterArc((3.505 + FILLET42_R, FILLET42_R), FILLET42_R, 180, 90)
            Line((3.505, FILLET42_R), (3.505, 0))
            Line((3.505, 0), (3.505 + FILLET42_R, 0))
        make_face()
    revolve(axis=Axis((-63.586701651, 76.538181464, -61.226769861), (1, 0, 0)), revolution_arc=135, mode=Mode.SUBTRACT)
    with BuildSketch(Plane(origin=(-63.586701651, 76.538181464, -64.731769861), x_dir=(0, 0, -1), z_dir=(0, -1, 0))) as fillet42_2_piece_10a_section:
        with BuildLine():
            CenterArc((FILLET42_R, FILLET42_R), FILLET42_R, 180, 90)
            Line((0, FILLET42_R), (0, 0))
            Line((0, 0), (FILLET42_R, 0))
        make_face()
    fillet42_2_piece_10a = extrude(amount=70.300681464, mode=Mode.PRIVATE)
    fillet42_2_piece_10a = split(fillet42_2_piece_10a, bisect_by=Plane(origin=(-62.750859381, 12.267975294, -67.463794567), z_dir=(0, -0.7071067811865477, 0.7071067811865475)), keep=Keep.TOP, mode=Mode.PRIVATE)
    with BuildSketch(Plane(origin=(-63.586701651, 8.80397683, -70.927793031), x_dir=(0, -0.7071067811865476, 0.7071067811865474), z_dir=(0, 0.7071067811865475, 0.7071067811865477))) as fillet42_2_piece_10b_section:
        with BuildLine():
            CenterArc((FILLET42_R, FILLET42_R), FILLET42_R, 180, 90)
            Line((0, FILLET42_R), (0, 0))
            Line((0, 0), (FILLET42_R, 0))
        make_face()
    fillet42_2_piece_10b = extrude(amount=54.754974683, mode=Mode.PRIVATE)
    fillet42_2_piece_10b = split(fillet42_2_piece_10b, bisect_by=Plane(origin=(-62.750859381, 11.136333609, -64.731769861), z_dir=(0, 0, -1)), keep=Keep.TOP, mode=Mode.PRIVATE)
    fillet42_2_piece_10 = fillet42_2_piece_10a & fillet42_2_piece_10b
    add(fillet42_2_piece_10, mode=Mode.SUBTRACT)
    with BuildSketch(Plane(origin=(-53.586701651, 47.521590732, -32.210179129), x_dir=(-1, 0, 0), z_dir=(0, -0.7071067811865475, -0.7071067811865477))) as fillet42_2_piece_11a_section:
        with BuildLine():
            CenterArc((FILLET42_R, -FILLET42_R), FILLET42_R, 90, 90)
            Line((0, -FILLET42_R), (0, 0))
            Line((0, 0), (FILLET42_R, 0))
        make_face()
    fillet42_2_piece_11a = extrude(amount=54.754974683, mode=Mode.PRIVATE)
    fillet42_2_piece_11a = split(fillet42_2_piece_11a, bisect_by=Plane(origin=(-54.503230396, 12.086140068, -64.731769861), z_dir=(0, 0, -1)), keep=Keep.TOP, mode=Mode.PRIVATE)
    fillet42_2_piece_11a = split(fillet42_2_piece_11a, bisect_by=Plane(origin=(-54.503230396, 10, -66.817909929), z_dir=(0, 1, 0)), keep=Keep.TOP, mode=Mode.PRIVATE)
    with BuildSketch(Plane(origin=(-53.586701651, 6.2375, -64.731769861), x_dir=(0, 0, -1), z_dir=(0, 1, 0))) as fillet42_2_piece_11b_section:
        with BuildLine():
            CenterArc((FILLET42_R, FILLET42_R), FILLET42_R, 180, 90)
            Line((0, FILLET42_R), (0, 0))
            Line((0, 0), (FILLET42_R, 0))
        make_face()
    fillet42_2_piece_11b = extrude(amount=70.300681464, mode=Mode.PRIVATE)
    fillet42_2_piece_11b = split(fillet42_2_piece_11b, bisect_by=Plane(origin=(-54.031936123, 13.371370658, -66.360399203), z_dir=(0, -0.7071067811865477, 0.7071067811865475)), keep=Keep.TOP, mode=Mode.PRIVATE)
    fillet42_2_piece_11b = split(fillet42_2_piece_11b, bisect_by=Plane(origin=(-54.031936123, 10, -65.671792575), z_dir=(0, 1, 0)), keep=Keep.TOP, mode=Mode.PRIVATE)
    fillet42_2_piece_11b = fillet42_2_piece_11b - Plane(origin=(-57.091701651, 10.849779926, -63.838808471), x_dir=(0, 0.7071067811865476, -0.7071067811865476), z_dir=(0, -0.7071067811865476, -0.7071067811865476)) * Cylinder(3.505, 155, mode=Mode.PRIVATE)
    fillet42_2_piece_11 = fillet42_2_piece_11a & fillet42_2_piece_11b
    add(fillet42_2_piece_11, mode=Mode.SUBTRACT)

    # Sketch5 → Boss-Extrude2 (add)
    with BuildSketch(Plane(origin=(0, 10, 0), x_dir=(1, 0, 0), z_dir=(0, 1, 0))):
        with Locations((-13.586701651, -22.768230139)):
            Rectangle(SKETCH5_W, SKETCH5_H)
    extrude(amount=BOSS_EXTRUDE2_DEPTH)

    # Sketch9 → Boss-Extrude4 (add)
    with BuildSketch(Plane(origin=(0, 100, 0), x_dir=(1, 0, 0), z_dir=(0, 1, 0))):
        Polygon((-13.529146595, 19.789324917), (-8.529146595, 24.789324917), (-13.536340977, 29.782130535), (-18.536340977, 24.782130535), align=None)
        Polygon((-18.536340977, 24.782130535), (-13.536340977, 29.782130535), (-48.586701651, 64.731769861), (-53.586701651, 64.731769861), (-53.586701651, 59.731769861), align=None)
        Polygon((-48.586701651, -15.268230139), (-13.529146595, 19.789324917), (-18.536340977, 24.782130535), (-53.586701651, -10.268230139), (-53.586701651, -15.268230139), align=None)
        Polygon((21.413298349, -15.052708789), (26.413298349, -15.052708789), (26.413298349, -10.052708789), (-8.529146595, 24.789324917), (-13.529146595, 19.789324917), align=None)
        Polygon((-13.536340977, 29.782130535), (-8.529146595, 24.789324917), (26.413298349, 59.731769861), (26.413298349, 64.731769861), (21.413298349, 64.731769861), align=None)
    boss_extrude4 = extrude(amount=-BOSS_EXTRUDE4_DEPTH)

    # Fillet106
    fillet106_edges = [part.edges().sort_by_distance(p)[0] for p in [
        (-13.586701651, 100, -64.731769861),
    ]]
    fillet(fillet106_edges, radius=FILLET106_R)

    # Fillet107
    fillet107_edges = [part.edges().sort_by_distance(p)[0] for p in [
        (26.413298349, 100, -24.839530536),
        (5.690978686, 100, -49.009450198),
        (-32.819071843, 100, -49.009450198),
        (-53.586701651, 100, -24.731769861),
        (-36.061521314, 100, -42.256950198),
        (-36.061521314, 100, -7.256950198),
        (-31.057924123, 100, -2.260547389),
        (3.942075877, 100, -2.368308064),
        (8.942075877, 100, -42.260547389),
        (8.942075877, 100, -7.368308064),
    ]]
    fillet(fillet107_edges, radius=FILLET107_R)

    # Fillet108
    fillet108_edges = [part.edges().sort_by_distance(p)[0] for p in [
        (-13.565110919, 100, 15.268230139),
    ]]
    fillet(fillet108_edges, radius=FILLET108_R)

    # Mirror3: Boss-Extrude4 across plane
    add(boss_extrude4.mirror(Plane.ZX.offset(50)))

    # Fillet109
    fillet109_edges = [part.edges().sort_by_distance(p)[0] for p in [
        (-11.086701651, 0, 15.268230139),
        (-13.586701651, 0, -64.731769861),
        (-53.586701651, 0, -24.731769861),
        (26.413298349, 0, -24.839530536),
        (8.942075877, 0, -42.260547389),
        (-36.061521314, 0, -42.256950198),
        (-31.057924123, 0, -2.260547389),
        (3.942075877, 0, -2.368308064),
        (8.942075877, 0, -7.368308064),
        (-36.061521314, 0, -7.256950198),
        (-31.061521314, 0, -47.256950198),
        (3.938478686, 0, -47.256950198),
    ]]
    fillet(fillet109_edges, radius=FILLET109_R)

    # Sketch10 → Boss-Extrude6 (add)
    with BuildSketch(Plane(origin=(0, 0, 0), x_dir=(-1, 0, 0), z_dir=(0, -1, 0))):
        with Locations((13.586701651, 24.731769861)):
            Rectangle(SKETCH10_W, SKETCH10_H)
    extrude(amount=-BOSS_EXTRUDE6_DEPTH)

    # Sketch11 → Boss-Extrude7 (add)
    with BuildSketch(Plane(origin=(0, 100, 0), x_dir=(1, 0, 0), z_dir=(0, 1, 0))):
        with Locations((-13.586701651, 24.731769861)):
            Rectangle(SKETCH11_W, SKETCH11_H)
    extrude(amount=-BOSS_EXTRUDE7_DEPTH)

    # Sketch12 → Boss-Extrude8 (add)
    with BuildSketch(Plane(origin=(0, 0, 20.268230139), x_dir=(-1, 0, 0), z_dir=(0, 0, -1))):
        with Locations(Location((13.586701651, 50, 0), (0, 0, 180))):
            Circle(SKETCH12_R)
    extrude(amount=BOSS_EXTRUDE8_DEPTH)

    # Sketch13 → Boss-Extrude9 (add)
    with BuildSketch(Plane(origin=(0, 0, 20.268230139), x_dir=(-1, 0, 0), z_dir=(0, 0, -1))):
        with BuildLine():
            Line((-0.555433973, 64.142135624), (2.980099933, 60.606601718))
            ThreePointArc((2.980099933, 60.606601718), (-1.413298349, 50), (2.980099933, 39.393398282))
            Line((2.980099933, 39.393398282), (-0.555433973, 35.857864376))
            ThreePointArc((-0.555433973, 35.857864376), (-6.413298349, 50), (-0.555433973, 64.142135624))
        make_face()
        with BuildLine():
            Line((27.728837274, 64.142135624), (24.193303368, 60.606601718))
            ThreePointArc((24.193303368, 60.606601718), (28.586701651, 50), (24.193303368, 39.393398282))
            Line((24.193303368, 39.393398282), (27.728837274, 35.857864376))
            ThreePointArc((27.728837274, 35.857864376), (33.586701651, 50), (27.728837274, 64.142135624))
        make_face()
    extrude(amount=BOSS_EXTRUDE9_DEPTH)

    # Sketch18 → Boss-Extrude10 (add)
    with BuildSketch(Plane(origin=(0, 10, 0), x_dir=(1, 0, 0), z_dir=(0, 1, 0))):
        with Locations(Location((-13.586701651, 27.231769861, 0), (0, 0, 90))):
            Circle(SKETCH18_R)
    extrude(amount=BOSS_EXTRUDE10_DEPTH)

    # Sketch19 → Boss-Extrude11 (add)
    with BuildSketch(Plane(origin=(0, 10, 0), x_dir=(1, 0, 0), z_dir=(0, 1, 0))):
        with BuildLine():
            Line((-26.469416566, 42.529993823), (-23.248737837, 38.705437833))
            ThreePointArc((-23.248737837, 38.705437833), (-28.586701651, 27.231769861), (-23.248737837, 15.758101889))
            Line((-23.248737837, 15.758101889), (-26.469416566, 11.933545899))
            ThreePointArc((-26.469416566, 11.933545899), (-33.586701651, 27.231769861), (-26.469416566, 42.529993823))
        make_face()
        with BuildLine():
            Line((-3.924665464, 15.758101889), (-0.703986735, 11.933545899))
            ThreePointArc((-0.703986735, 11.933545899), (6.413298349, 27.231769861), (-0.703986735, 42.529993823))
            Line((-0.703986735, 42.529993823), (-3.924665464, 38.705437833))
            ThreePointArc((-3.924665464, 38.705437833), (1.413298349, 27.231769861), (-3.924665464, 15.758101889))
        make_face()
    extrude(amount=BOSS_EXTRUDE11_DEPTH)

    # Sketch25 → Cut-Extrude4 (cut)
    with BuildSketch(Plane(origin=(0, 100, 0), x_dir=(1, 0, 0), z_dir=(0, 1, 0))):
        Polygon((26.413298349, 59.731769861), (-8.586701651, 24.731769861), (26.413298349, -10.268230139), align=None)
        Polygon((21.413298349, -15.268230139), (-13.586701651, 19.731769861), (-48.586701651, -15.268230139), align=None)
        Polygon((-18.586701651, 24.731769861), (-53.586701651, 59.731769861), (-53.586701651, -10.268230139), align=None)
        Polygon((21.413298349, 64.731769861), (-48.586701651, 64.731769861), (-13.586701651, 29.731769861), align=None)
    extrude(amount=-CUT_EXTRUDE4_DEPTH, mode=Mode.SUBTRACT)

    # Sketch26 → Boss-Extrude12 (add)
    with BuildSketch(Plane.ZY.offset(63.586701651)):
        with Locations((-24.385211709, 50.758041136)):
            Rectangle(SKETCH26_W, SKETCH26_H)
    extrude(amount=-BOSS_EXTRUDE12_DEPTH)

    # Fillet113
    fillet113_edges = [part.edges().sort_by_distance(p)[0] for p in [
        (26.413298349, 100, -24.731769861),
    ]]
    fillet(fillet113_edges, radius=FILLET113_R)

    # Fillet114
    fillet114_edges = [part.edges().sort_by_distance(p)[0] for p in [
        (36.413298349, 72.5, -7.231769861),
        (36.413298349, 72.5, -42.231769861),
        (36.413298349, 90, -24.731769861),
        (36.413298349, 67.5, -2.231769861),
        (36.413298349, 50, 15.268230139),
        (36.413298349, 32.5, -2.231769861),
        (36.413298349, 27.5, -42.231769861),
        (36.413298349, 27.5, -7.231769861),
        (36.413298349, 10, -24.731769861),
        (36.413298349, 32.5, -47.231769861),
        (36.413298349, 50, -64.731769861),
        (36.413298349, 67.5, -47.231769861),
    ]]
    fillet(fillet114_edges, radius=FILLET114_R)

    # Sketch28 → Boss-Extrude13 (add)
    with BuildSketch(Plane(origin=(-53.586701651, 0, 0), x_dir=(0, 0, -1), z_dir=(1, 0, 0))):
        with Locations(Location((27.231769861, 50, 0), (0, 0, 180))):
            Circle(SKETCH28_R)
    extrude(amount=BOSS_EXTRUDE13_DEPTH)

    # Sketch29 → Boss-Extrude14 (add)
    with BuildSketch(Plane(origin=(-53.586701651, 0, 0), x_dir=(0, 0, -1), z_dir=(1, 0, 0))):
        with BuildLine():
            Line((38.705437833, 59.662036187), (42.529993823, 62.882714916))
            ThreePointArc((42.529993823, 62.882714916), (27.231769861, 70), (11.933545899, 62.882714916))
            Line((11.933545899, 62.882714916), (15.758101889, 59.662036187))
            ThreePointArc((15.758101889, 59.662036187), (27.231769861, 65), (38.705437833, 59.662036187))
        make_face()
        with BuildLine():
            Line((38.705437833, 40.337963813), (42.529993823, 37.117285084))
            ThreePointArc((42.529993823, 37.117285084), (27.231769861, 30), (11.933545899, 37.117285084))
            Line((11.933545899, 37.117285084), (15.758101889, 40.337963813))
            ThreePointArc((15.758101889, 40.337963813), (27.231769861, 35), (38.705437833, 40.337963813))
        make_face()
    extrude(amount=BOSS_EXTRUDE14_DEPTH)

    # Fillet115
    fillet115_edges = [part.edges().sort_by_distance(p)[0] for p in [
        (-53.586701651, 100, -24.731769861),
        (-13.586701651, 100, 15.268230139),
        (-31.086701651, 100, -2.231769861),
        (3.913298349, 100, -2.231769861),
        (10.665798349, 100, -5.479269861),
        (10.665798349, 100, -43.984269861),
        (3.913298349, 100, -47.231769861),
        (-13.586701651, 100, -64.731769861),
        (-31.086701651, 100, -47.231769861),
        (-36.086701651, 100, -42.231769861),
        (-36.086701651, 100, -7.231769861),
    ]]
    fillet(fillet115_edges, radius=FILLET115_R)


solid = part.part
